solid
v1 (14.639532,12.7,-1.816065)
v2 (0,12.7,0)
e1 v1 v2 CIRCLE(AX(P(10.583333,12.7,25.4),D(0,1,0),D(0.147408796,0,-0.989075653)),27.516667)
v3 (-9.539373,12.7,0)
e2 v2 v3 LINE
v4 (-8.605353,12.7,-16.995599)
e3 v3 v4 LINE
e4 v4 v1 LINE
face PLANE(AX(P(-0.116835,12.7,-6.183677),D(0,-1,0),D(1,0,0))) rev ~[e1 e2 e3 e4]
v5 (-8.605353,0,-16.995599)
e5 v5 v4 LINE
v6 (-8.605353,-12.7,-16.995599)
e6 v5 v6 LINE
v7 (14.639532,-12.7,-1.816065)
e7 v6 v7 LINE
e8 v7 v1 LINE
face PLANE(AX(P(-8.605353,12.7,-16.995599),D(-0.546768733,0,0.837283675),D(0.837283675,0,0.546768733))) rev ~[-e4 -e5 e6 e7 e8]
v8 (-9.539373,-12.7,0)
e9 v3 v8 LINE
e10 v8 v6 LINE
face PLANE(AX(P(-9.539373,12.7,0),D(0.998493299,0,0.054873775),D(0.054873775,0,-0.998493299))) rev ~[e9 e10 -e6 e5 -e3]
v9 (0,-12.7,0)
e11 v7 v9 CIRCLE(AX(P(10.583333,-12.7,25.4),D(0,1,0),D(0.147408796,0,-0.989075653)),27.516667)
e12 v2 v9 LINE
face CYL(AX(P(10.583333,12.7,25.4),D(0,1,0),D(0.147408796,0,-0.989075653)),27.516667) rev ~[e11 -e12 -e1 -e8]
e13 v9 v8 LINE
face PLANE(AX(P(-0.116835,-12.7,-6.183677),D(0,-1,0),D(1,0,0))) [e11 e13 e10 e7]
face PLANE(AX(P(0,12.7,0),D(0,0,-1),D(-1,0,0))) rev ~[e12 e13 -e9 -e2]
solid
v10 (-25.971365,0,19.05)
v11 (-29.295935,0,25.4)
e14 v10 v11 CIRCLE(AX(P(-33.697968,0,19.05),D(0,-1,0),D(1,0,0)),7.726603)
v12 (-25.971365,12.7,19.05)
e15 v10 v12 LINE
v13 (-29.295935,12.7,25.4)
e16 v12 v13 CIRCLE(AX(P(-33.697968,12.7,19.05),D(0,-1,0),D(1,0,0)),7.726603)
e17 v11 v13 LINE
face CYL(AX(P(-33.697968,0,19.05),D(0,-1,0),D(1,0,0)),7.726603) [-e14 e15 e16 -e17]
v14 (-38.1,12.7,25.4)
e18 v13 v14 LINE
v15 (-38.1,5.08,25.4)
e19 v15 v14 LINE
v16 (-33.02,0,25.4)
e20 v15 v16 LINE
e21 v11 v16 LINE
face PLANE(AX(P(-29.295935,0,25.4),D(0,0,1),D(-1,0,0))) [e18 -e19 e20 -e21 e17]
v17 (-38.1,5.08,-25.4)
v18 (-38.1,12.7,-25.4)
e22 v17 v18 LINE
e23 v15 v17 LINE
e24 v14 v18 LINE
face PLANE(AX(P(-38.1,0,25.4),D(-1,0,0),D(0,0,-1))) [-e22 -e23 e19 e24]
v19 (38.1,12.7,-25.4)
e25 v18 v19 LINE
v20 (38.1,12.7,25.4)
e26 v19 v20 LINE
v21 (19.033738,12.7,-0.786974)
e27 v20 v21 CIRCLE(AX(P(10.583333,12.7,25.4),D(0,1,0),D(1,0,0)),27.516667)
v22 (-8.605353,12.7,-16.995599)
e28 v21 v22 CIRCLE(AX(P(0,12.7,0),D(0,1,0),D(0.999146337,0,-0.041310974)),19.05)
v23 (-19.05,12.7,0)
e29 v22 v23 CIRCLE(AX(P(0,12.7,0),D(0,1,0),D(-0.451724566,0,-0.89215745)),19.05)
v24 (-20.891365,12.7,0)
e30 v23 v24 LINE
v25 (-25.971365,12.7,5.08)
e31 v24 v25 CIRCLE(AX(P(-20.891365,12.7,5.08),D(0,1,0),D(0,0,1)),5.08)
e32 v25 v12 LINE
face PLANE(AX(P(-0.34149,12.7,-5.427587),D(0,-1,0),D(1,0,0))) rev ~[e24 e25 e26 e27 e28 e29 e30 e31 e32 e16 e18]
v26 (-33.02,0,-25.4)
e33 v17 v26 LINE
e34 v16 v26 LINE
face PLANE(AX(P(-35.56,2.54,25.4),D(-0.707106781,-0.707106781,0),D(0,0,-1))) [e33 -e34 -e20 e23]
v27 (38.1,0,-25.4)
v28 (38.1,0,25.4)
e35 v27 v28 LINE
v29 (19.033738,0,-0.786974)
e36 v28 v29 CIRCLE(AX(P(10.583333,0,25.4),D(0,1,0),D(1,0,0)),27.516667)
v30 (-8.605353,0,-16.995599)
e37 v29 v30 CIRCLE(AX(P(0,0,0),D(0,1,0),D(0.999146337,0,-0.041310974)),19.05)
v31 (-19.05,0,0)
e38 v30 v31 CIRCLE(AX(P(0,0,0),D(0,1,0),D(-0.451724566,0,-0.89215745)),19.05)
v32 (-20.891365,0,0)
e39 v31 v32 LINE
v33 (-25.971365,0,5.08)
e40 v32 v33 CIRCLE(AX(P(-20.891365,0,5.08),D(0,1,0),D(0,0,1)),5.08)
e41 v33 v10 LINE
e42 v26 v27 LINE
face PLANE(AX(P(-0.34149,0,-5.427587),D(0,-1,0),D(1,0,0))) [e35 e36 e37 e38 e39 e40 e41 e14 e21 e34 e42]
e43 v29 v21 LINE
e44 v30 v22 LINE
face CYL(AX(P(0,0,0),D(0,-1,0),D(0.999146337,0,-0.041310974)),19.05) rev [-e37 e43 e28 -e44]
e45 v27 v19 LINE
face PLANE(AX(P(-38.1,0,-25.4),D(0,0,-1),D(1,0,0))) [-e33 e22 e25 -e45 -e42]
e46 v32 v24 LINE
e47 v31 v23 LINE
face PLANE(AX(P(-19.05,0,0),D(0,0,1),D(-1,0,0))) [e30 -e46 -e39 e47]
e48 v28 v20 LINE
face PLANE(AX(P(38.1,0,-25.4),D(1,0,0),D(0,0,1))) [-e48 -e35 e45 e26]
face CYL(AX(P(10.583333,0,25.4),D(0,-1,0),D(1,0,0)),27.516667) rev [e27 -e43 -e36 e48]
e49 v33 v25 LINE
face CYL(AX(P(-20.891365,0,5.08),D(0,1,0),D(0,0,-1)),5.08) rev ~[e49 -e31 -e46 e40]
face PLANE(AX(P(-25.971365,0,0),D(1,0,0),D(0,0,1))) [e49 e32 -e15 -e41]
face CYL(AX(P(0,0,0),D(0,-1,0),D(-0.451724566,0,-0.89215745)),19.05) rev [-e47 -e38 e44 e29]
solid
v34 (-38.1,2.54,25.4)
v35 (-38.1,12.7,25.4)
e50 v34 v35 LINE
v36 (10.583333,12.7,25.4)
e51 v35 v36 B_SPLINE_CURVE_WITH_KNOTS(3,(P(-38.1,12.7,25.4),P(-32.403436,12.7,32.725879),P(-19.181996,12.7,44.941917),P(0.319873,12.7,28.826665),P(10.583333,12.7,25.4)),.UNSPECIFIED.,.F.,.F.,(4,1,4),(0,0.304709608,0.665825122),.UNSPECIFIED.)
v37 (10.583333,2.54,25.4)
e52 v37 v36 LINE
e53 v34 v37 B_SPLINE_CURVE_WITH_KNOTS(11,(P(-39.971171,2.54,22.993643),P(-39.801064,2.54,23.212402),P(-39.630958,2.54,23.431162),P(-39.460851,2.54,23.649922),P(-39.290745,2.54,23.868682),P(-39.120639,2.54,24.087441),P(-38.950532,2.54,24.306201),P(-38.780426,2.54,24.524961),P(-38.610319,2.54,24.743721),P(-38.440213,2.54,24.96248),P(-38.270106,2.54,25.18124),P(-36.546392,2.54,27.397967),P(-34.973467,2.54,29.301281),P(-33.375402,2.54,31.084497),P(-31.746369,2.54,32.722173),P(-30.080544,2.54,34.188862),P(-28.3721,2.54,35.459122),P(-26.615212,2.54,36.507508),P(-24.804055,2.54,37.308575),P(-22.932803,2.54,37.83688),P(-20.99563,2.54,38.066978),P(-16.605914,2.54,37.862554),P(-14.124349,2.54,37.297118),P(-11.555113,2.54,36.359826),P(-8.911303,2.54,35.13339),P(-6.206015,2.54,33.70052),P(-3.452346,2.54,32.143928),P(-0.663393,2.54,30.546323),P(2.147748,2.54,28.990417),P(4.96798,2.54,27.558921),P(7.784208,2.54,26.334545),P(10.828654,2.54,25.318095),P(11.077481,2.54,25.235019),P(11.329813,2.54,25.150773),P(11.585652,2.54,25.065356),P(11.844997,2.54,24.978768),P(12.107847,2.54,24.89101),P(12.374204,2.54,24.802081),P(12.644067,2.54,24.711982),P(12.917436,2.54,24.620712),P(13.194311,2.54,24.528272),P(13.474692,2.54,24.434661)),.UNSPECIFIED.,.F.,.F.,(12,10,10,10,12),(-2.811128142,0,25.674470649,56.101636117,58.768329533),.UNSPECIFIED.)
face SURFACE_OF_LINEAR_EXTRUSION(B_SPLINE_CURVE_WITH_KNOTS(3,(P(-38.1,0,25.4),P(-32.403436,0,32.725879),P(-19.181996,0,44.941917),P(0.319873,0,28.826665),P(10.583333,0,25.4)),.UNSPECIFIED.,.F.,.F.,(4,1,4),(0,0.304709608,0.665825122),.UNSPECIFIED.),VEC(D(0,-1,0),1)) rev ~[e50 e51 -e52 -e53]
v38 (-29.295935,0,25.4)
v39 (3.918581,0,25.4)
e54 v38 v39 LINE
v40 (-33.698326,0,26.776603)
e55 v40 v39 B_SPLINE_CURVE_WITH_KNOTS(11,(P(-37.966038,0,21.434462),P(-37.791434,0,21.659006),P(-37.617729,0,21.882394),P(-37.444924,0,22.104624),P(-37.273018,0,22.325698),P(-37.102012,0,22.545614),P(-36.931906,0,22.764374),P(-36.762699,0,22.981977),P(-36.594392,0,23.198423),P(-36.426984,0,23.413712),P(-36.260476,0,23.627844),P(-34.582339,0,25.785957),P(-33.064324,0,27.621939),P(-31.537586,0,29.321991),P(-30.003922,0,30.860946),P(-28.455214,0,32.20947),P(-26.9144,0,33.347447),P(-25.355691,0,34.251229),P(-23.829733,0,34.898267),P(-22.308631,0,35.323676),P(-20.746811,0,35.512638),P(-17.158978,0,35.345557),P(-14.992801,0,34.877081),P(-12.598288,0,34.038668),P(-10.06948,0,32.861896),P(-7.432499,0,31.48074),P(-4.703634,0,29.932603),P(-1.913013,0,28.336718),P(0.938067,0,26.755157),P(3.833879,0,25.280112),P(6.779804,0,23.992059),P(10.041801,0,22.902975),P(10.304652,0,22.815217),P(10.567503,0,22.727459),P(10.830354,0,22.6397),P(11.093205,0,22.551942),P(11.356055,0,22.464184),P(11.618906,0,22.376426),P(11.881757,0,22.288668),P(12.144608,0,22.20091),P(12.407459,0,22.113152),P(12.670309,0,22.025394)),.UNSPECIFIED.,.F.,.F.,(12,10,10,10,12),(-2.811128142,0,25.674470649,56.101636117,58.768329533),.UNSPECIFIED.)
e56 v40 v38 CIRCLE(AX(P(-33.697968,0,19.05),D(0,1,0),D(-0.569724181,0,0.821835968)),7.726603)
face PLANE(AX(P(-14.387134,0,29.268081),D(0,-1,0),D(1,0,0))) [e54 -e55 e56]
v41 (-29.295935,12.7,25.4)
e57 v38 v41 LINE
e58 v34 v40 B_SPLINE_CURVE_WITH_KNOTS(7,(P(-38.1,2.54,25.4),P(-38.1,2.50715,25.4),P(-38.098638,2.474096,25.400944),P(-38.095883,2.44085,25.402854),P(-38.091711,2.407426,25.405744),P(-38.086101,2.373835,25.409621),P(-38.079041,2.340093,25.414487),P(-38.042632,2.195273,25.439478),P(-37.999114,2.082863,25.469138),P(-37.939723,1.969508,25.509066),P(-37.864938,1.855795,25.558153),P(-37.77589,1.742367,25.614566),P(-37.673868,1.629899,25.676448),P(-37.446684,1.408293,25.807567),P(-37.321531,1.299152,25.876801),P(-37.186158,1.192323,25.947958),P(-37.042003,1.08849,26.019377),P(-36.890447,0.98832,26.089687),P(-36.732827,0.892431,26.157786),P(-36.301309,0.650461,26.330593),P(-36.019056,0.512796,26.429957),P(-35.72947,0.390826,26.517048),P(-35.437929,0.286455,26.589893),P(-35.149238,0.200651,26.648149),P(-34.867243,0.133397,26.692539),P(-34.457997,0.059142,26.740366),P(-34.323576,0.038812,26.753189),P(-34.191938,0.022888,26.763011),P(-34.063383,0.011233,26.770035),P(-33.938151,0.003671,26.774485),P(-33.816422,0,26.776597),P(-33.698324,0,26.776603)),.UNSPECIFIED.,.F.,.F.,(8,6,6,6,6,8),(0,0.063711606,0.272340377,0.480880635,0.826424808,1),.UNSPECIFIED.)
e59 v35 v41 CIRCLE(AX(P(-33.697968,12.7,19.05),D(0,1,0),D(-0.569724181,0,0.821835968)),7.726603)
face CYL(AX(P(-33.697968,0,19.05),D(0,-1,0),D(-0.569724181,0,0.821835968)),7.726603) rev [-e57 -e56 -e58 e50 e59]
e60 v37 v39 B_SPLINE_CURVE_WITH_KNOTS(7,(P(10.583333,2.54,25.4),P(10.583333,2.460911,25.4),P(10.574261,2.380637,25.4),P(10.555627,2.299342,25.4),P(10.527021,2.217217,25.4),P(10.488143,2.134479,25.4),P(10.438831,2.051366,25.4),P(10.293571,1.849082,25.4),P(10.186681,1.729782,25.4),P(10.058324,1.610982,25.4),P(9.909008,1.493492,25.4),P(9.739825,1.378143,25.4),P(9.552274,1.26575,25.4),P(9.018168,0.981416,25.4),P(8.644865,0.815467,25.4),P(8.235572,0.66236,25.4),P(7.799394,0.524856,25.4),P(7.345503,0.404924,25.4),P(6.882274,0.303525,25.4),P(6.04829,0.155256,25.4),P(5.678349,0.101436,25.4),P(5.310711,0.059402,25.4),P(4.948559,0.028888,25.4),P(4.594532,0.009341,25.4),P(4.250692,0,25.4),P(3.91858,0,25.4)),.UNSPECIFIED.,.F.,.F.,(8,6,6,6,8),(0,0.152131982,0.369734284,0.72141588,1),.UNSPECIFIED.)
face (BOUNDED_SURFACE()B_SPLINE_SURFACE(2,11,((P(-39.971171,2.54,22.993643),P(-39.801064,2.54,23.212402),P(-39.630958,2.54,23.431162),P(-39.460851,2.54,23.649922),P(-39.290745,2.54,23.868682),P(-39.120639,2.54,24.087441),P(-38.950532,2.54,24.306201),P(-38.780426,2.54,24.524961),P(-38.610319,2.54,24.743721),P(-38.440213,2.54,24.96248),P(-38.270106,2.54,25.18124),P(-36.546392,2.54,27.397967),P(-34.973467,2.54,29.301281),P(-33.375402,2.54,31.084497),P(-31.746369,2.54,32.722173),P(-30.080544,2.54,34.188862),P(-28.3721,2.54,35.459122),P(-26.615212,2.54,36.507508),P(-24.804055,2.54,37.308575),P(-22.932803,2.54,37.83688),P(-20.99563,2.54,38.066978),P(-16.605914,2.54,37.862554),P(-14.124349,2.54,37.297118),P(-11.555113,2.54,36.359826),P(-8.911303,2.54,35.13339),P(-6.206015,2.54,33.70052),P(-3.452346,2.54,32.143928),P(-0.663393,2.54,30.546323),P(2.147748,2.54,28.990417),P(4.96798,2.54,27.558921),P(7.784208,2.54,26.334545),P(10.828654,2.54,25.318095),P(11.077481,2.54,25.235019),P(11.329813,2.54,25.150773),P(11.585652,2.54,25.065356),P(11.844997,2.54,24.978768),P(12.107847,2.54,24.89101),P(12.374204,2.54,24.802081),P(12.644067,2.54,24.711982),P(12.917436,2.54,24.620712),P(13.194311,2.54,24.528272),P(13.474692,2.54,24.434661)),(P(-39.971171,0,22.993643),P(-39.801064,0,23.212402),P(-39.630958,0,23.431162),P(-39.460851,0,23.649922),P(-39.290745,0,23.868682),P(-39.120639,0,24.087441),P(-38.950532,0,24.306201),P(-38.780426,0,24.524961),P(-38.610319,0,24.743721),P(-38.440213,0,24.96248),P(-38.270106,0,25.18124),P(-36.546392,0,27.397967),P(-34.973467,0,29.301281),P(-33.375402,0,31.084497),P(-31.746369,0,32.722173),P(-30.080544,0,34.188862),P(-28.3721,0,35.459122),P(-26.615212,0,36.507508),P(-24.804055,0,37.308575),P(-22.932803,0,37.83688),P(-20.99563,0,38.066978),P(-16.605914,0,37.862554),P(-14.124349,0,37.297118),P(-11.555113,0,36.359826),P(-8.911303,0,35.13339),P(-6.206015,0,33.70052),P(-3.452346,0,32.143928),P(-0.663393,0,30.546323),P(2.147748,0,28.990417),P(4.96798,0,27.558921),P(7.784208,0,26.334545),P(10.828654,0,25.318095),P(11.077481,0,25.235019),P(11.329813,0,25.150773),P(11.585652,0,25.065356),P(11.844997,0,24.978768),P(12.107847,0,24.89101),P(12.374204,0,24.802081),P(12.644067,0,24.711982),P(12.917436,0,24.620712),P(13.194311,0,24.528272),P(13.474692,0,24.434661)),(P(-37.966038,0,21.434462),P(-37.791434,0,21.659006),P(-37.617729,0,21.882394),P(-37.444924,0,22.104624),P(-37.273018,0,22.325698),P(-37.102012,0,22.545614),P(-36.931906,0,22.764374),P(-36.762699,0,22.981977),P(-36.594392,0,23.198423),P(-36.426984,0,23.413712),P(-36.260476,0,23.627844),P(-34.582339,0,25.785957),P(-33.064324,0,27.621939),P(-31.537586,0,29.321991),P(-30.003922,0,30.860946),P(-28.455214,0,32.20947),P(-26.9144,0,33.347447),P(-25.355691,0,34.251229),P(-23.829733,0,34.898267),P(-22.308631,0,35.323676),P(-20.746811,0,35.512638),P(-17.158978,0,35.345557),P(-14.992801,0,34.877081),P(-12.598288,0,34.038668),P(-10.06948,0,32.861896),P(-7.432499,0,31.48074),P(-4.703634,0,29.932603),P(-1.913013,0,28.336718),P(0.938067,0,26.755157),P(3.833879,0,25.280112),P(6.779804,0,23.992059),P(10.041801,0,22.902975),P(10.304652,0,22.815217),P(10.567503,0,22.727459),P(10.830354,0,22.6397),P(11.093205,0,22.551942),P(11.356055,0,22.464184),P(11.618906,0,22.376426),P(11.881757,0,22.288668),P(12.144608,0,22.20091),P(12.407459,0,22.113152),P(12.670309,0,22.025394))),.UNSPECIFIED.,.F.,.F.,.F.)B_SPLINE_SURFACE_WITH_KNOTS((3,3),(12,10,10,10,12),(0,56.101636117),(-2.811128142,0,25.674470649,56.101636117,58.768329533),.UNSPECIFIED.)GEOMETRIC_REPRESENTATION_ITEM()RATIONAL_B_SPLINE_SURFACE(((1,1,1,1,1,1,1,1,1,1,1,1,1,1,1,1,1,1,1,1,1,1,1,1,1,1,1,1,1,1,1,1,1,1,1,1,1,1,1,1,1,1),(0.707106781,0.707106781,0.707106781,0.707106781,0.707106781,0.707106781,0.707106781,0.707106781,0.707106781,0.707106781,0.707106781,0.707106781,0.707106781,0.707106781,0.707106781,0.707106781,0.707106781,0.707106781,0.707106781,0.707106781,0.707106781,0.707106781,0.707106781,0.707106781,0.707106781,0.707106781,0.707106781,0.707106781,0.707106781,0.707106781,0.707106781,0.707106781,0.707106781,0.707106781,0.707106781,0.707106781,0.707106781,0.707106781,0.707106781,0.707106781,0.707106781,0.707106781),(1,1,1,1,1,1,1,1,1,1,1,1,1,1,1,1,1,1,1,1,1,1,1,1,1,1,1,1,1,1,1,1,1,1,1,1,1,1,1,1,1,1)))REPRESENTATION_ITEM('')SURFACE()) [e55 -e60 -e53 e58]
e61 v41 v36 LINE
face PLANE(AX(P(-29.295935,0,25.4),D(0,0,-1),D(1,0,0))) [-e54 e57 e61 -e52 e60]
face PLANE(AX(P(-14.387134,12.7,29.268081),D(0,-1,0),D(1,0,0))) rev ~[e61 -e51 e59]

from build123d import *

# Parameters (mm, degrees)
F1_DEPTH = 12.7
F2_DEPTH = 25.4
F3_R     = 2.54
F5_SIZE  = 5.08
F6_R     = 5.08


# Not quite as in the source:
# - a feature of the source that left no trace in its solid (it failed there, or was rolled back) is left out


with BuildPart() as f1:
    # F0 (on Front) → F1 (new body)
    with BuildSketch(Plane.XZ):
        with BuildLine():
            ThreePointArc((14.6395320428, -1.8160650439), (7.1957981438, -1.9073534013), (0, 0))
            Line((0, 0), (-9.5393729797, 0))
            Line((-9.5393729797, 0), (-8.6053529899, -16.9955994281))
            Line((-8.6053529899, -16.9955994281), (14.6395320428, -1.8160650439))
        make_face()
    extrude(amount=-F1_DEPTH)

    # F2 (add): a face of the model
    f2_faces = [f1.faces().sort_by_distance(p)[0] for p in [
        (-1.4587062215, 12.7, -6.2717912086),
    ]]


with BuildPart() as f1b:
    # F0 (on Front) → F1, piece 2 (new body)
    with BuildSketch(Plane.XZ):
        with BuildLine():
            ThreePointArc((-8.6053529899, -16.9955994281), (-16.2301336171, -9.9742299338), (-19.05, 0))
            Line((-19.05, 0), (-25.971364924, 0))
            Line((-25.971364924, 0), (-25.971364924, 19.05))
            ThreePointArc((-25.971364924, 19.05), (-26.8527815535, 22.633827134), (-29.2959352279, 25.4))
            Line((-29.2959352279, 25.4), (-38.1, 25.4))
            Line((-38.1, 25.4), (-38.1, -25.4))
            Line((-38.1, -25.4), (38.1, -25.4))
            Line((38.1, -25.4), (38.1, 25.4))
            ThreePointArc((38.1, 25.4), (32.8284890456, 9.2037043809), (19.0337377265, -0.7869740527))
            ThreePointArc((19.0337377265, -0.7869740527), (9.6367881679, -16.4327360414), (-8.6053529899, -16.9955994281))
        make_face()
    extrude(amount=-F1_DEPTH)


with BuildPart() as f1c:
    # F0 (on Front) → F1, piece 3 (new body)
    with BuildSketch(Plane.XZ):
        with BuildLine():
            ThreePointArc((-38.1, 25.4), (-33.6979676139, 26.7766026899), (-29.2959352279, 25.4))
            Line((-29.2959352279, 25.4), (10.5833333333, 25.4))
            add(Edge.make_bspline(
                [(-38.1, 25.4), (-32.4034356926, 32.7258786812), (-19.1819964183, 44.9419170764), (0.319873071, 28.826665029), (10.5833333333, 25.4)],
                knots=[0, 0, 0, 0, 0.304709608, 0.6658251219, 0.6658251219, 0.6658251219, 0.6658251219], degree=3))
        make_face()
    extrude(amount=-F1_DEPTH)

    # F3
    f3_edges = [f1c.edges().sort_by_distance(p)[0] for p in [
        (-14.799697, 0, 37.233797),
    ]]
    fillet(f3_edges, radius=F3_R)


with BuildPart() as f1_1:
    add(f1.part)

    add(f1b.part)  # F2 merges F1b
    extrude(f2_faces, amount=-F2_DEPTH)

    # F5
    f5_edges = [f1_1.edges().sort_by_distance(p)[0] for p in [
        (-38.1, 0, 0),
    ]]
    chamfer(f5_edges, length=F5_SIZE)

    # F6
    f6_edges = [f1_1.edges().sort_by_distance(p)[0] for p in [
        (-25.971365, 6.35, 0),
    ]]
    fillet(f6_edges, radius=F6_R)


solid = Compound([f1c.part, f1_1.part])
